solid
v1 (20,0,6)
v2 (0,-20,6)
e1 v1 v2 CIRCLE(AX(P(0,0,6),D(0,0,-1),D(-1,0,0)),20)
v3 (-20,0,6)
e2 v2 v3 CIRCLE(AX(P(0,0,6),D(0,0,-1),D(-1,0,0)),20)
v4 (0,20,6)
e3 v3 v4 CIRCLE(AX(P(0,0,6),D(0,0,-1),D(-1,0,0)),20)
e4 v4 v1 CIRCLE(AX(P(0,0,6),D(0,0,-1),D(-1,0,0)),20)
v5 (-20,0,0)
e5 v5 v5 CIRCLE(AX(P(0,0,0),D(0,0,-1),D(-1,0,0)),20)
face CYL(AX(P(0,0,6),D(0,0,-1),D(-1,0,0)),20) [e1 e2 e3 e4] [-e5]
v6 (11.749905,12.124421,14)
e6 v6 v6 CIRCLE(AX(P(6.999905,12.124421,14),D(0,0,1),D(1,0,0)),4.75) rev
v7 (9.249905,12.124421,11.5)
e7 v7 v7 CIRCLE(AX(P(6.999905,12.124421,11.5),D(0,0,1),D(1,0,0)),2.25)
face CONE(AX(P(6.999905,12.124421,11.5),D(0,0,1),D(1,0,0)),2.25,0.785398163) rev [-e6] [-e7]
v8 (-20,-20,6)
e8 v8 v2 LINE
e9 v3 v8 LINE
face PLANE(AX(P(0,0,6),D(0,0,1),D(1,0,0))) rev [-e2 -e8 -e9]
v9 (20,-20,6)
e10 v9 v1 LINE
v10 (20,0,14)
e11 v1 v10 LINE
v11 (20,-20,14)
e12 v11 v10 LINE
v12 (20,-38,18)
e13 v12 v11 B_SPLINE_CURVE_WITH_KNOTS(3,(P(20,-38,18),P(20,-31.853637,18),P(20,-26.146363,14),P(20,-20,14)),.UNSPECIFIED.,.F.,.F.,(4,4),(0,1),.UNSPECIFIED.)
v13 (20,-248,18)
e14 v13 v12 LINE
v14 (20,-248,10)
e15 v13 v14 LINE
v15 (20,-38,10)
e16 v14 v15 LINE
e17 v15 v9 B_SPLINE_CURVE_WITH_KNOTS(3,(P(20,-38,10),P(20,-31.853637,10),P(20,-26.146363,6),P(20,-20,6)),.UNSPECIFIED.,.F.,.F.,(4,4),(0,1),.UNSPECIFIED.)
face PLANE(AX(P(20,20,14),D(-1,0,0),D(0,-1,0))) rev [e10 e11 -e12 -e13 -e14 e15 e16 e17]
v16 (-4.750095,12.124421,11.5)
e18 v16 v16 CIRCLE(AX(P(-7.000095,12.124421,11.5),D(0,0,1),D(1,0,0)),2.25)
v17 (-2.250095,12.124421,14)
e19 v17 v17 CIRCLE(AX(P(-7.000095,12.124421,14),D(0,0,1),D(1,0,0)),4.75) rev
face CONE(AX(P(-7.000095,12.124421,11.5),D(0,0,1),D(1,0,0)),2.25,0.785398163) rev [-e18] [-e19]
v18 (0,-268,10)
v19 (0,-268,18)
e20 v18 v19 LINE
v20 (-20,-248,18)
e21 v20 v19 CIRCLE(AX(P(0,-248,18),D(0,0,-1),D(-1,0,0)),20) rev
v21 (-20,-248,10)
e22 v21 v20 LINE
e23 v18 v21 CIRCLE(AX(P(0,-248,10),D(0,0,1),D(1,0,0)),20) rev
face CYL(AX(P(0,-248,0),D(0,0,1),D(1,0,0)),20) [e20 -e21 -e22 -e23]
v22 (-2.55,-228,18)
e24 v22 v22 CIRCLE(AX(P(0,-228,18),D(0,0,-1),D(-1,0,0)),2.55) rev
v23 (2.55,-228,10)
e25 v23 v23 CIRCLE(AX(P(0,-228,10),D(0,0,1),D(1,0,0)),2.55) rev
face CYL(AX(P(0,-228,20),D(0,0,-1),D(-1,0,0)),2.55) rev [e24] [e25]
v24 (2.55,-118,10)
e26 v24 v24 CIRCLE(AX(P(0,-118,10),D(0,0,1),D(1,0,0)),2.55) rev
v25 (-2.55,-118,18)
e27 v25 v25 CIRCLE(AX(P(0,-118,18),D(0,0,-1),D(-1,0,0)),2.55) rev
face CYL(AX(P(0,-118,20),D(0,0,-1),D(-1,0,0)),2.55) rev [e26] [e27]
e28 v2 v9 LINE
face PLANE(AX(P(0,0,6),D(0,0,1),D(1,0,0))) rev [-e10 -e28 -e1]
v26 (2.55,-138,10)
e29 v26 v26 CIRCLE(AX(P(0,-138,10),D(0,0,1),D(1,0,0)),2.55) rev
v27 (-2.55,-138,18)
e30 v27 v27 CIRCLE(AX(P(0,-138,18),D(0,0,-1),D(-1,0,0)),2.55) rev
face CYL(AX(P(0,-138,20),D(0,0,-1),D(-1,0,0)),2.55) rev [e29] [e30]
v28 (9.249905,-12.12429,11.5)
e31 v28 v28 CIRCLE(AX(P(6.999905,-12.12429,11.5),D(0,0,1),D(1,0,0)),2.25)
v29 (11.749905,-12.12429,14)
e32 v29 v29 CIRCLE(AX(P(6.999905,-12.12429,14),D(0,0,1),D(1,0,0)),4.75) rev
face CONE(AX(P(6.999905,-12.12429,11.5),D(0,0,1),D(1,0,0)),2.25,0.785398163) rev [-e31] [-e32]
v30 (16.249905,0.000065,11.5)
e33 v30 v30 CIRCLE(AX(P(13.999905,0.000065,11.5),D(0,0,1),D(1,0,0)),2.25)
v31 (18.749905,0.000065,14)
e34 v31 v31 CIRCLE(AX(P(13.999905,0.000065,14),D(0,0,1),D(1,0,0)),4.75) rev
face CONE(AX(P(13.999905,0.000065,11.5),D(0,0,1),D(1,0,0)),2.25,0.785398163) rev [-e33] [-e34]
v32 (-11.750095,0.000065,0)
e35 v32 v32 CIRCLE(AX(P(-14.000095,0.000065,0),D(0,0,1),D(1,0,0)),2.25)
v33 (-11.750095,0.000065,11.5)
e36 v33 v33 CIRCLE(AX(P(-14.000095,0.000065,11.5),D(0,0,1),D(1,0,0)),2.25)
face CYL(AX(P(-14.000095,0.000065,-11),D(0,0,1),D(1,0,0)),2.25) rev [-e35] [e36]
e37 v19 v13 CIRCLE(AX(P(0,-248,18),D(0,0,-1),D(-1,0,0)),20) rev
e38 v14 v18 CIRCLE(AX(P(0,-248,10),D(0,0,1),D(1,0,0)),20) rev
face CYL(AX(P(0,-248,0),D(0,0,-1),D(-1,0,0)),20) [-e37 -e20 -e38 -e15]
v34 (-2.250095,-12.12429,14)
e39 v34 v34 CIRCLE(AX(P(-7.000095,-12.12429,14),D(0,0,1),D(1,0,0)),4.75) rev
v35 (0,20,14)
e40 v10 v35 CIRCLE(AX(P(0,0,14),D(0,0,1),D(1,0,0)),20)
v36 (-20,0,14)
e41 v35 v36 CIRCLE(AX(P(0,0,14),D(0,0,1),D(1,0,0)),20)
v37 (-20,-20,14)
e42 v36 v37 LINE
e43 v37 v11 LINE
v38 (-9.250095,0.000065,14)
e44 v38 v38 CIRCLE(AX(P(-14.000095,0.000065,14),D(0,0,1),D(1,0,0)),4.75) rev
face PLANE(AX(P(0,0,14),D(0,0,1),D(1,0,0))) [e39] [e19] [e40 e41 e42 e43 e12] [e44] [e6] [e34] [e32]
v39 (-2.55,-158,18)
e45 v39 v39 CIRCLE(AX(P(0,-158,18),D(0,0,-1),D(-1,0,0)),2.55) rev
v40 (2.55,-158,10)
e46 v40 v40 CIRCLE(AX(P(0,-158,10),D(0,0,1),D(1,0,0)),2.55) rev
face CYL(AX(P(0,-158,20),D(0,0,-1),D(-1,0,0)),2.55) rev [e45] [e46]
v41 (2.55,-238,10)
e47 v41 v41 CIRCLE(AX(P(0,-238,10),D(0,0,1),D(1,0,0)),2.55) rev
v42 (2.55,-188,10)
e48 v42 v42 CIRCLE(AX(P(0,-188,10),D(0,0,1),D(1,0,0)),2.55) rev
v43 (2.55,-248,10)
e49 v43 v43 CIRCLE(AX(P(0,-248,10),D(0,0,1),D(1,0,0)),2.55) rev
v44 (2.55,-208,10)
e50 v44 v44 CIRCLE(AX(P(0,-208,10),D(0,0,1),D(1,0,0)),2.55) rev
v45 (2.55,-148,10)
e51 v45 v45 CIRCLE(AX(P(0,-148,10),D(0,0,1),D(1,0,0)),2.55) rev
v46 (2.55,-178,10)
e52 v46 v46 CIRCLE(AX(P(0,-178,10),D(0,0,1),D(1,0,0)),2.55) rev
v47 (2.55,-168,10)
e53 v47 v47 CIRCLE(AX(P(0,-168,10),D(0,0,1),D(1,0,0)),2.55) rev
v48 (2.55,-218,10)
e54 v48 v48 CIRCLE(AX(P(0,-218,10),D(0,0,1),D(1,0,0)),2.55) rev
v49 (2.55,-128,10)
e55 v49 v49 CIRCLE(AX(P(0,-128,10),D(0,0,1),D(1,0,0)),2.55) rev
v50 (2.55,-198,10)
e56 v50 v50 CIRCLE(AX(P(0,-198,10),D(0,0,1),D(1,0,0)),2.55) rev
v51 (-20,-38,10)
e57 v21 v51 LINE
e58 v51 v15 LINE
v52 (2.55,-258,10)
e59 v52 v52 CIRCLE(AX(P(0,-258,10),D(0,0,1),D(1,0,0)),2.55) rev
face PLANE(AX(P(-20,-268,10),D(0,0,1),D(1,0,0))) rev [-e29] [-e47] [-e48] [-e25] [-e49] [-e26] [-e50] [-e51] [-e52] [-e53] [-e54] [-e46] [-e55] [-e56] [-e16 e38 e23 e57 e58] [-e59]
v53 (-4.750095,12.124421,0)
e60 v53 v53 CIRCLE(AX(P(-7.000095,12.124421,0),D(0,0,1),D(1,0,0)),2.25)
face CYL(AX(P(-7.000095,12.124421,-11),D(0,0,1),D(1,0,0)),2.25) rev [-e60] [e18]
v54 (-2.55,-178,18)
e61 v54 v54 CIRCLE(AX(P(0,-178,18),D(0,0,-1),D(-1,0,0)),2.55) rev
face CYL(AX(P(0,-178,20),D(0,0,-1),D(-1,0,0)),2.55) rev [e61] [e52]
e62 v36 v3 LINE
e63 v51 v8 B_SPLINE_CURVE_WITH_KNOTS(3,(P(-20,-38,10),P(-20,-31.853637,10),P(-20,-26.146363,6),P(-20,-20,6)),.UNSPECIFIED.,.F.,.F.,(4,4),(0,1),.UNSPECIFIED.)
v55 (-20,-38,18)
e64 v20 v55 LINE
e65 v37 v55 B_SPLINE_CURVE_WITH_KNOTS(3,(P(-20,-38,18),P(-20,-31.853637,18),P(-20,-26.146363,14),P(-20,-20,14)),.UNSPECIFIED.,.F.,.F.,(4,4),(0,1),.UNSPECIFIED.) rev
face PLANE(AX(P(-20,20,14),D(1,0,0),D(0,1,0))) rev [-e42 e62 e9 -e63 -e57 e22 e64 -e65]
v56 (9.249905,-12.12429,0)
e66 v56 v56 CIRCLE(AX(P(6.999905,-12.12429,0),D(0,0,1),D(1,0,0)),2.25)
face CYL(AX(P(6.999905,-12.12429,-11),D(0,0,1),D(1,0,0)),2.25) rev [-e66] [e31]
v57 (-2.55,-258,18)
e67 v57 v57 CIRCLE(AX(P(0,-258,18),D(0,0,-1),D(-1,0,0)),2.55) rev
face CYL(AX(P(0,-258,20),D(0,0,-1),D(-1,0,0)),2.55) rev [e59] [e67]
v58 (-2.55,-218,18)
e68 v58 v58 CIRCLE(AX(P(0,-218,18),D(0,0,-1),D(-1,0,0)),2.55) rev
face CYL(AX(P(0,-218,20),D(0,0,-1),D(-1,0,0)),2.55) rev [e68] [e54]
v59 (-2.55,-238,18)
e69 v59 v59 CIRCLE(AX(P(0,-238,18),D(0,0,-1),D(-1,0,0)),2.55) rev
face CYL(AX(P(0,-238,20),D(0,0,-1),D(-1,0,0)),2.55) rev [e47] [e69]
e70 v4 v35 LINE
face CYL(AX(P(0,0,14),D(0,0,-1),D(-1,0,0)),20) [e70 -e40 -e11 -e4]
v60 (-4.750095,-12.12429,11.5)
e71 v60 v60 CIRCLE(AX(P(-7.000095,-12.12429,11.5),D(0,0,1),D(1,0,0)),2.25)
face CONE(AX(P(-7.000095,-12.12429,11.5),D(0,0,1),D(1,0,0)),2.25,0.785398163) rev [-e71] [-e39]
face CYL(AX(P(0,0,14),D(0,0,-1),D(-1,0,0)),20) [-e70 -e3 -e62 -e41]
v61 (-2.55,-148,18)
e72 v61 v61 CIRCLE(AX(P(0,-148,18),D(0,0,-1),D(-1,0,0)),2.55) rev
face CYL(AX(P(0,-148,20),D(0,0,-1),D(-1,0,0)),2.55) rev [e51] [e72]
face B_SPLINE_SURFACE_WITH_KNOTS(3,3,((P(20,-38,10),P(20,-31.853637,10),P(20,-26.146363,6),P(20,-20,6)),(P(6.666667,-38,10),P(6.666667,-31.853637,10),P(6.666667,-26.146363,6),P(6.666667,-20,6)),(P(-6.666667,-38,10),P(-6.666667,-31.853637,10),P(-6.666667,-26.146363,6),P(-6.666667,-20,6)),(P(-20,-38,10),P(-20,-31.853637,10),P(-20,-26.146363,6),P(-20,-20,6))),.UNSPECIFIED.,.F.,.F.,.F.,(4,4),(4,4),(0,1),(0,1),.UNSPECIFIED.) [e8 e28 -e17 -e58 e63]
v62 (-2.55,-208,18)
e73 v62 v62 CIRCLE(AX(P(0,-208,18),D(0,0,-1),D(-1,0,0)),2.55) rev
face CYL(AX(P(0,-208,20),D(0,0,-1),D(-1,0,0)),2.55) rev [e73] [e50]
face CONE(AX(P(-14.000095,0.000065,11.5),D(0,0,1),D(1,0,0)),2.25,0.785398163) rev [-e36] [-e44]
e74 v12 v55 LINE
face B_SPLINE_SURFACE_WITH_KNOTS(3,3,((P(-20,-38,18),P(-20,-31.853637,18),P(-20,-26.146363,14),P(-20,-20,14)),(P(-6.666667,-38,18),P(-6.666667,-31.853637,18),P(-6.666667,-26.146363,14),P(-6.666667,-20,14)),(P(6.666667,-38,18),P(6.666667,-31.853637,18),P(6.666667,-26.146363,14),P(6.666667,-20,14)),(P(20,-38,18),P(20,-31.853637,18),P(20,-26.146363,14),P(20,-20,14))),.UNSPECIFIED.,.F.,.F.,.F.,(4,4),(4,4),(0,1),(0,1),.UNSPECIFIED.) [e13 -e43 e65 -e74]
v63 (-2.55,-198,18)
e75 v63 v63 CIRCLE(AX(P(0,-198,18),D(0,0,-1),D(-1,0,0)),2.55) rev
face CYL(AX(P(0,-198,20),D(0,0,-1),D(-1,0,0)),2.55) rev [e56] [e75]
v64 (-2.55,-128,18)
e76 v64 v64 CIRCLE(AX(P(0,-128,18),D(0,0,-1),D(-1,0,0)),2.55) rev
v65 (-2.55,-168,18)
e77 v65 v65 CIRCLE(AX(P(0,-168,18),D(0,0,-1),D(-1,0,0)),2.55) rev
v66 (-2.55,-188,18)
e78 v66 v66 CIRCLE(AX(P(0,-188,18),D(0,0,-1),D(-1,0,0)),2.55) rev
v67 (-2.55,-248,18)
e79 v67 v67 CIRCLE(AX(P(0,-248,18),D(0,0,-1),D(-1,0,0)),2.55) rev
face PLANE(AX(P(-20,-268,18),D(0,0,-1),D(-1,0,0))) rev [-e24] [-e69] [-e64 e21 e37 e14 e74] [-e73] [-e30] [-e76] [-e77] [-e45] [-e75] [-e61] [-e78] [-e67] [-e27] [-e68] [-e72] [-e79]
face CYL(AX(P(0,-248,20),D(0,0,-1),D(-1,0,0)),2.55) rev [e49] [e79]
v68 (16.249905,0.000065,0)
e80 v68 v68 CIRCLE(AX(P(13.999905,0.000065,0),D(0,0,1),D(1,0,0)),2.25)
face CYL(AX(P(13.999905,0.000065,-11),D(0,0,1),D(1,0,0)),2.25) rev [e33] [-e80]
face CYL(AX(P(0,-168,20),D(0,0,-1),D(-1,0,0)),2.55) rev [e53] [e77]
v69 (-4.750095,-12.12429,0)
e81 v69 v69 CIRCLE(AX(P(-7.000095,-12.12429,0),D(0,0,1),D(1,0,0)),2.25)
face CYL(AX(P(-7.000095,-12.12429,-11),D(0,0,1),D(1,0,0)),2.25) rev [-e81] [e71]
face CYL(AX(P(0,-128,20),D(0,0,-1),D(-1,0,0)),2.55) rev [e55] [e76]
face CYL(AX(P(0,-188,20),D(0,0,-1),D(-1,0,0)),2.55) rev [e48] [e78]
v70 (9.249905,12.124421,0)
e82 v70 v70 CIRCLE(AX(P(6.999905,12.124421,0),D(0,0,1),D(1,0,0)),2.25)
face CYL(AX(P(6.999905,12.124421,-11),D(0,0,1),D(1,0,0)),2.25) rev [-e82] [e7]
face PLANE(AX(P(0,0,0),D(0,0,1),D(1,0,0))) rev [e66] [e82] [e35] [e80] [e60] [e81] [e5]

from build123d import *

# Parameters (mm, degrees)
SKETCH7_W           = 40
SKETCH7_H           = 40
BOSS_EXTRUDE1_DEPTH = 14
LOFT1_START         = -20
LOFT1_DEPTH         = 40
SKETCH16_W          = 49.026286786
SKETCH16_H          = 65.242270374
SKETCH16_R          = 20
CUT_EXTRUDE3_DEPTH  = 6
SKETCH17_W          = 40
SKETCH17_H          = 8
BOSS_EXTRUDE5_DEPTH = 230
SKETCH10_R          = 2.25
CUT_EXTRUDE1_DEPTH  = 25
CHAMFER1_SIZE       = 2.5
FILLET3_R           = 20
FILLET4_R           = 20
SKETCH41_R          = 2.55
CUT_EXTRUDE4_DEPTH  = 20
LPATTERN1_COUNT     = 15
LPATTERN1_PITCH     = 10


# Read off the part's stored shape, not the designer's step: Loft1
with BuildPart() as part:
    # Sketch7 → Boss-Extrude1 (new body)
    with BuildSketch(Plane.XY):
        Rectangle(SKETCH7_W, SKETCH7_H)
    extrude(amount=BOSS_EXTRUDE1_DEPTH)

    # Loft1 outline → Loft1 (add)
    with BuildSketch(Plane.YZ.offset(LOFT1_START)):
        with BuildLine():
            add(Edge.make_bspline(
                [(-38, 18), (-31.853637028, 18), (-26.146362972, 14), (-20, 14)],
                knots=[0, 0, 0, 0, 1, 1, 1, 1], degree=3))
            Line((-38, 18), (-38, 10))
            add(Edge.make_bspline(
                [(-38, 10), (-31.853637028, 10), (-26.146362972, 6), (-20, 6)],
                knots=[0, 0, 0, 0, 1, 1, 1, 1], degree=3))
            Line((-20, 6), (-20, 14))
        make_face()
    extrude(amount=LOFT1_DEPTH)

    # Sketch16 → Cut-Extrude3 (cut)
    with BuildSketch(Plane(origin=(0, 0, 0), x_dir=(-1, 0, 0), z_dir=(0, 0, -1))):
        Rectangle(SKETCH16_W, SKETCH16_H)
        Circle(SKETCH16_R, mode=Mode.SUBTRACT)
    extrude(amount=-CUT_EXTRUDE3_DEPTH, mode=Mode.SUBTRACT)

    # Sketch17 → Boss-Extrude5 (add)
    with BuildSketch(Plane(origin=(0, -38, 0), x_dir=(-1, 0, 0), z_dir=(0, -1, 0))):
        with Locations((0, -14)):
            Rectangle(SKETCH17_W, SKETCH17_H)
    extrude(amount=BOSS_EXTRUDE5_DEPTH)

    # Sketch10 → Cut-Extrude1 (cut)
    with BuildSketch(Plane.XY.offset(14)):
        with Locations((-7.00009521, 12.124420806)):
            Circle(SKETCH10_R)
        with Locations((6.99990479, 12.124420806)):
            Circle(SKETCH10_R)
        with Locations((13.99990479, 6.5153e-05)):
            Circle(SKETCH10_R)
        with Locations((6.99990479, -12.1242905)):
            Circle(SKETCH10_R)
        with Locations((-7.00009521, -12.1242905)):
            Circle(SKETCH10_R)
        with Locations((-14.00009521, 6.5153e-05)):
            Circle(SKETCH10_R)
    extrude(amount=-CUT_EXTRUDE1_DEPTH, mode=Mode.SUBTRACT)

    # Chamfer1
    chamfer1_edges = [part.edges().sort_by_distance(p)[0] for p in [
        (4.74990479, 12.124420806, 14),
        (-9.25009521, 12.124420806, 14),
        (-16.25009521, 6.5153e-05, 14),
        (-9.25009521, -12.1242905, 14),
        (4.74990479, -12.1242905, 14),
        (11.74990479, 6.5153e-05, 14),
    ]]
    chamfer(chamfer1_edges, length=CHAMFER1_SIZE)

    # Fillet3
    fillet3_edges = [part.edges().sort_by_distance(p)[0] for p in [
        (20, 20, 10),
        (-20, 20, 10),
    ]]
    fillet(fillet3_edges, radius=FILLET3_R - 0.0001)  # a hair under: the kernel refuses the full size

    # Fillet4
    fillet4_edges = [part.edges().sort_by_distance(p)[0] for p in [
        (-20, -268, 14),
        (20, -268, 14),
    ]]
    fillet(fillet4_edges, radius=FILLET4_R - 0.0001)  # a hair under: the kernel refuses the full size

    # Sketch41 → Cut-Extrude4 (cut)
    with BuildSketch(Plane.XY):
        with Locations(Location((0, -258, 0), (0, 0, 180))):
            Circle(SKETCH41_R)
    cut_extrude4 = extrude(amount=CUT_EXTRUDE4_DEPTH, mode=Mode.SUBTRACT)

    # LPattern1: Cut-Extrude4 ×15
    with Locations(*[(0, i * LPATTERN1_PITCH, 0) for i in range(1, LPATTERN1_COUNT)]):
        add(cut_extrude4, mode=Mode.SUBTRACT)


solid = part.part
